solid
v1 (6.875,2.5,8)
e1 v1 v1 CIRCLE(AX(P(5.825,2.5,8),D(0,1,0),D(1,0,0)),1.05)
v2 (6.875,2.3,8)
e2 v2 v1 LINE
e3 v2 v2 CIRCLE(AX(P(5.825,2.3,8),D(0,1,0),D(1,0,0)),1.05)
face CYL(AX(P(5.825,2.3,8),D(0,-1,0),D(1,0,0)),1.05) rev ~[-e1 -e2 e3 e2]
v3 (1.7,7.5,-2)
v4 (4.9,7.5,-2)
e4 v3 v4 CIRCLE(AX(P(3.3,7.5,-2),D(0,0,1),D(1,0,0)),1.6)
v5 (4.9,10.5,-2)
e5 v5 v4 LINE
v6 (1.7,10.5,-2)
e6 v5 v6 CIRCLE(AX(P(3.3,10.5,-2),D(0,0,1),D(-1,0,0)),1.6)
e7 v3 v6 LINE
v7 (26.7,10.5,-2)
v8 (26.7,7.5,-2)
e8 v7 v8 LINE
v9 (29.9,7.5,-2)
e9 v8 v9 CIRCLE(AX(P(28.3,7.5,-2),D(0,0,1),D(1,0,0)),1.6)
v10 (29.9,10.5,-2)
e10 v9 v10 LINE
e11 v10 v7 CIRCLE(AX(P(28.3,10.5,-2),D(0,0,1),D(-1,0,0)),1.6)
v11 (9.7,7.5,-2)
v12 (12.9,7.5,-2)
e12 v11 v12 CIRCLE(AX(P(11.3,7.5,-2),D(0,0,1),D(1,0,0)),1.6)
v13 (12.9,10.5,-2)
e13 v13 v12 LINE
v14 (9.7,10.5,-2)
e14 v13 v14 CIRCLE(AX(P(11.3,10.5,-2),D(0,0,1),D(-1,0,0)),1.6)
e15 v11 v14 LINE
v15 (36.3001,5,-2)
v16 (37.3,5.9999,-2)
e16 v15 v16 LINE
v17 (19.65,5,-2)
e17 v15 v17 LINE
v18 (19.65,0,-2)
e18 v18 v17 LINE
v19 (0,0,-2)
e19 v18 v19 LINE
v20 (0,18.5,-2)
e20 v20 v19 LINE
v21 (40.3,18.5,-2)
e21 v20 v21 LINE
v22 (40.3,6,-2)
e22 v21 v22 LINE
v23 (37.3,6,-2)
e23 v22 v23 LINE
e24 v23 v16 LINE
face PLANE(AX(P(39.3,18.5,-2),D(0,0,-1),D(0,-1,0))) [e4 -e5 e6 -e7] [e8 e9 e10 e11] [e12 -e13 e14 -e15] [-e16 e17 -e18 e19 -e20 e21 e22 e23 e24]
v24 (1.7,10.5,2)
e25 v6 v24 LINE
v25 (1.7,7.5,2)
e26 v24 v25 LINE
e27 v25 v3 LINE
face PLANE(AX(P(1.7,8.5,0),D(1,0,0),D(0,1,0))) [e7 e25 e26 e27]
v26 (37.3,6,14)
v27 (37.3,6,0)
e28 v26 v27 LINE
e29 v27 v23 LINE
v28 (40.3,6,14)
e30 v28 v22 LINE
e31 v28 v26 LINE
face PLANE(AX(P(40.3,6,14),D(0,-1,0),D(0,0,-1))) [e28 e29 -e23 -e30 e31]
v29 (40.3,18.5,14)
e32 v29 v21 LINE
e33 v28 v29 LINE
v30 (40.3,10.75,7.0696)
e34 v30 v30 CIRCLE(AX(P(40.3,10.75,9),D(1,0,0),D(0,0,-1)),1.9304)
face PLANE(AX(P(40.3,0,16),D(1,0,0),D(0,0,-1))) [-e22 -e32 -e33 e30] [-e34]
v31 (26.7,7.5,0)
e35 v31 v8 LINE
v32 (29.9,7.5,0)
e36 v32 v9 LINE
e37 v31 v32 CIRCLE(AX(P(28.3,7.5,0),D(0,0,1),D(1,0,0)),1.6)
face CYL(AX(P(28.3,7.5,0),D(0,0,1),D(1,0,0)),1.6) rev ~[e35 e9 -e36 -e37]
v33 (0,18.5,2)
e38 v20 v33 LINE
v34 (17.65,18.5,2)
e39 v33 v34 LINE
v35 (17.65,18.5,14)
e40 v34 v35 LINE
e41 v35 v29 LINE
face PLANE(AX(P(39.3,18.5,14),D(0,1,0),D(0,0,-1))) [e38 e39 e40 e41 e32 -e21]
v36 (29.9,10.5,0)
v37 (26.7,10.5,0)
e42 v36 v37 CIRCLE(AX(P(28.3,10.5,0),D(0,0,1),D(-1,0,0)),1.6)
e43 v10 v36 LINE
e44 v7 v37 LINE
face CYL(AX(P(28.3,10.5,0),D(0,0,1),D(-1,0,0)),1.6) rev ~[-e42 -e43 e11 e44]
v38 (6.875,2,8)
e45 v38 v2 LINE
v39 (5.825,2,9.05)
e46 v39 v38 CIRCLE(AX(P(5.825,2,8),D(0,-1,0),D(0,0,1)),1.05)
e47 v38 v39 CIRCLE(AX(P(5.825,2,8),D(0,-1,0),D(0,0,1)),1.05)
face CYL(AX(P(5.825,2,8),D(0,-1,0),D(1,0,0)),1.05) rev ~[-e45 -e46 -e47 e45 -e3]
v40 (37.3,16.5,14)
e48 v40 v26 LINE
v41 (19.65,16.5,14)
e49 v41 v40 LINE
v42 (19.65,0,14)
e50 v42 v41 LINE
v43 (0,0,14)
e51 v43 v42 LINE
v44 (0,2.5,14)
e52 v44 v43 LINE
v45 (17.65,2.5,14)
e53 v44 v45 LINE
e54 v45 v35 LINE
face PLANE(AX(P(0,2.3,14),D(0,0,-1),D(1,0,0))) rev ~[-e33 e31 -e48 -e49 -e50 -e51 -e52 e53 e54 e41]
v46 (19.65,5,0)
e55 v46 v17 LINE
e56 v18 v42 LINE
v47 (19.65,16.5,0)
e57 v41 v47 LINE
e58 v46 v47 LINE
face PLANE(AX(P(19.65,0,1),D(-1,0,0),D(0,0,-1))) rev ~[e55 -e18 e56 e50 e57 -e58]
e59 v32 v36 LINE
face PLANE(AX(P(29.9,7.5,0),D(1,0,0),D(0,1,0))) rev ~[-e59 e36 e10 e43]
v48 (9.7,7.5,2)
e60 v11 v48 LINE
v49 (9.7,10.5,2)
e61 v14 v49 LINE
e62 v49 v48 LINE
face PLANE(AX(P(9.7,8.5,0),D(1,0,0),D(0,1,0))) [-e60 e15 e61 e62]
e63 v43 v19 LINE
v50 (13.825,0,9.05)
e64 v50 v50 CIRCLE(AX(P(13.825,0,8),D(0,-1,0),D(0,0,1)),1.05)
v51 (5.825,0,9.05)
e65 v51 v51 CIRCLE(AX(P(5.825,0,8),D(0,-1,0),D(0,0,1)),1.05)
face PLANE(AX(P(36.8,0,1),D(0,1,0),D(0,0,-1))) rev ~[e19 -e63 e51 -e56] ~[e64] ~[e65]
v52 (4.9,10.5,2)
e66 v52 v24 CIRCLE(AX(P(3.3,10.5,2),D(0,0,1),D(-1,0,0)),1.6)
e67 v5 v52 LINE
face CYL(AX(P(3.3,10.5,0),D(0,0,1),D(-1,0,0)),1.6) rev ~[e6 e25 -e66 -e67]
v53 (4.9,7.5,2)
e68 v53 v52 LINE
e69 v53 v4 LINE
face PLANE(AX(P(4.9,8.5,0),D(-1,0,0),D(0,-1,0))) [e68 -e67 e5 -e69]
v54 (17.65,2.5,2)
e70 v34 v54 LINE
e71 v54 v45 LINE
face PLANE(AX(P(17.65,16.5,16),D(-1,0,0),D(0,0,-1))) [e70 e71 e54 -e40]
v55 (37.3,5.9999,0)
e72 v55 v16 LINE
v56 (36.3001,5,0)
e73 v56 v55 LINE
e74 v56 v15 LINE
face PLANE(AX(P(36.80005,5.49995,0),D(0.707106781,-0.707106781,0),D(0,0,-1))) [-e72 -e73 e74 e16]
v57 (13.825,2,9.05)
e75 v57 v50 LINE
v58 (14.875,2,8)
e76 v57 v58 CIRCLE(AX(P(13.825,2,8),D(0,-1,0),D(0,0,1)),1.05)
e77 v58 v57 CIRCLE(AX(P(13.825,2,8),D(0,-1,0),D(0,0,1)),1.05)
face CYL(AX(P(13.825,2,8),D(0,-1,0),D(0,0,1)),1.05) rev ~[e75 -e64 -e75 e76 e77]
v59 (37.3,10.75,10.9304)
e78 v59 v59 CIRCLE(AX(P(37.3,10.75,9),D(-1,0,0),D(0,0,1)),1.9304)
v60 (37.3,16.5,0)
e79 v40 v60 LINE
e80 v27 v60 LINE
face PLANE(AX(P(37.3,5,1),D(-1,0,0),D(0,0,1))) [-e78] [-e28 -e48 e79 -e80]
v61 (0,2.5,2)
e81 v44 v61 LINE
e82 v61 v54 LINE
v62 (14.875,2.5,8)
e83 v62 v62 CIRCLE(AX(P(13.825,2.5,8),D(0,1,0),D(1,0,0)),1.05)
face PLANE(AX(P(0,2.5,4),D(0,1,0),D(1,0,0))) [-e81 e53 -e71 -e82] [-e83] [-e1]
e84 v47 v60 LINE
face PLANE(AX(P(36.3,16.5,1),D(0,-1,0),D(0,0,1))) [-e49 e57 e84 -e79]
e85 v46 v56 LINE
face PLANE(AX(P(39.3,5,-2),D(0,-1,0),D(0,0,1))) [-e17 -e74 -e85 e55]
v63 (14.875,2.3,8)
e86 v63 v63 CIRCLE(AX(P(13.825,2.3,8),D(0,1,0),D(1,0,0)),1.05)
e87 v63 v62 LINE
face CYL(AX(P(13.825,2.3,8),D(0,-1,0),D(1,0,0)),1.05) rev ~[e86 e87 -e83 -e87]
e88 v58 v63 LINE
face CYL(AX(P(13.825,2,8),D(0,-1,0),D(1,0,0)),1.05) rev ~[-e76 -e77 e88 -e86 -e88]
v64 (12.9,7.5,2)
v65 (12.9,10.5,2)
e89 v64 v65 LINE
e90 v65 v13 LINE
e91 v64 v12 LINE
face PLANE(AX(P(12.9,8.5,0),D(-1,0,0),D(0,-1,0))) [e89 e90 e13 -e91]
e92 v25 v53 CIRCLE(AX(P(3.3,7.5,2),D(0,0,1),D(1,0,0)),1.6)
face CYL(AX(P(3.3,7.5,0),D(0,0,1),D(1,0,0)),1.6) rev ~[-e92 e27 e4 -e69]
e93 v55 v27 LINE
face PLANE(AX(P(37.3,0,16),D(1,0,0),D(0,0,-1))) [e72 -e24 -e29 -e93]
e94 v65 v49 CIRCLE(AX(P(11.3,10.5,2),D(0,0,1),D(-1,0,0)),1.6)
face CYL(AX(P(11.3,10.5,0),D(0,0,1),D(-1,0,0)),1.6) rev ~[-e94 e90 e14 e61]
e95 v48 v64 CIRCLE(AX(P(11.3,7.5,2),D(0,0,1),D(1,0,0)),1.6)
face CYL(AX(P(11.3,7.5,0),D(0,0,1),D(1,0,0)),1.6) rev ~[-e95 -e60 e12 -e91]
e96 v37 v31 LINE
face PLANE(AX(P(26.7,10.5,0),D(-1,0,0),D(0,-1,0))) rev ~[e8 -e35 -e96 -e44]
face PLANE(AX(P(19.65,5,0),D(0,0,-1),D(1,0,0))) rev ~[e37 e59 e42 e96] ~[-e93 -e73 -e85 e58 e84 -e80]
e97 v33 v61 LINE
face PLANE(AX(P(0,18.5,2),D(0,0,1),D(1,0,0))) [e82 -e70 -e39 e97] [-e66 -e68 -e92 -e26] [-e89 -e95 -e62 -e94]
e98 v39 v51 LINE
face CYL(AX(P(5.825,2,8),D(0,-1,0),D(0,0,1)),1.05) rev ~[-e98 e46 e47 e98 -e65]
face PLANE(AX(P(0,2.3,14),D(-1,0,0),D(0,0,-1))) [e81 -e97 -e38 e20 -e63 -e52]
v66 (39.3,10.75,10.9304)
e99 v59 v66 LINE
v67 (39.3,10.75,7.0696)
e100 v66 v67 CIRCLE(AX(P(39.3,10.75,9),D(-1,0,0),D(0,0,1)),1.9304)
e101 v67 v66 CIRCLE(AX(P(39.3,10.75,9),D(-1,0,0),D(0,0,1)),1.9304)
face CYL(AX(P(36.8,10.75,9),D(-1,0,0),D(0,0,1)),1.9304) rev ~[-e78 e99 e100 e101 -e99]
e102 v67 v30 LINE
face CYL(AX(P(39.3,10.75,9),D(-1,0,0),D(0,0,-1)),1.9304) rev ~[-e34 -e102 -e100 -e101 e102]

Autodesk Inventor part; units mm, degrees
ref_plane "YZ Plane" through (0, 0, 0) normal (1, 0, 0) x (0, 1, 0)
ref_plane "XZ Plane" through (0, 0, 0) normal (0, 1, 0) x (-1, 0, 0)
ref_plane "XY Plane" through (0, 0, 0) normal (0, 0, 1) x (1, 0, 0)
sketch "Sketch1" plane through (0, 0, 0) normal (0, 0, 1) x (1, 0, 0)
  line L0 (0, 0) -> (49.1, 0)
  line L1 (49.1, 0) -> (49.1, 12.5)
  line L2 (49.1, 12.5) -> (0, 12.5)
  line L3 (0, 12.5) -> (0, 0)
  line L4 (0, 0) -> (49.1, 0)
  line L5 (49.1, 0) -> (49.1, 12.5)
  dimension "d0" = 49.1
  dimension "d1" = 12.5
extrude "Extrusion1" add sketch "Sketch1" along normal blind 14
sketch "Sketch2" plane through (0, 0, 0) normal (-1, 0, 0) x (0, 0, 1)
  line L0 (0, 0) -> (2, 0)
  line L1 (2, 0) -> (2, 5)
  line L2 (2, 5) -> (0, 5)
  line L3 (0, 5) -> (0, 0)
  dimension "d4" = 2
  dimension "d5" = 5
sketch "Sketch3" plane through (0, 0, 14) normal (0, 0, 1) x (1, 0, 0)
  line L0 (0, 12.5) -> (0, 0) projected
  line L1 (49.1, 0) -> (49.1, 12.5) projected
  line L2 (0, 0) -> (49.1, 0)
  line L3 (49.1, 0) -> (47.6, 0)
  line L4 (0, 0) -> (49.1, 0) projected
  line L5 (47.6, 0) -> (47.6, 11.5)
  line L6 (49.1, 12.5) -> (0, 12.5) projected
  line L7 (47.6, 11.5) -> (19.65, 11.5)
  line L8 (19.65, 11.5) -> (19.65, 0)
  dimension "d8" = 1.5
  dimension "d9" = 11.5
  dimension "d10" = 27.95
extrude "Extrusion3" cut sketch "Sketch3" against normal blind 13 contours L8 L7 L5 L2
sketch "Sketch4" plane through (0, 0, 14) normal (-1, 0, 0) x (0, 0, 1)
  line L0 (0, 12.5) -> (0, 0) projected
  line L1 (0, 0) -> (0, 2)
  line L2 (0, 2) -> (0, 12.5)
  line L3 (0, 2) -> (-10, 2)
  line L4 (-12, 5) -> (-12, 0) projected
  line L5 (-10, 2) -> (-10, 12.5)
  line L6 (-14, 12.5) -> (0, 12.5) projected
  line L7 (-10, 12.5) -> (0, 12.5)
  point P0 (-14, 0)
  dimension "d13" = 2
  dimension "d14" = 10
extrude "Extrusion4" cut sketch "Sketch4" against normal blind 17.65
sketch "Sketch5" plane through (0, 2, 14) normal (0, 1, 0) x (1, 0, 0)
  line L0 (17.65, 0) -> (0, 0) projected
  line L1 (0, 0) -> (5.825, 0)
  line L2 (5.825, 0) -> (5.825, 6)
  line L3 (5.825, 6) -> (13.825, 6)
  circle A0 centre (5.825, 6) radius 1.05
  circle A1 centre (13.825, 6) radius 1.05
  point P0 (0, 14)
  dimension "d18" = 5.825
  dimension "d19" = 6
  dimension "d20" = 8
  dimension "d21" = 2.1
  dimension "d22" = 2.1
hole "Hole1" at (5.825, 2, 8) at (13.825, 2, 8) direction (0, -1, 0) diameter 2.1 depth 20 tip angle 118
sketch "Sketch6" plane through (0, 0, 0) normal (0, 0, -1) x (-1, 0, 0)
  line L0 (0, 12.5) -> (0, 8.5)
  line L1 (0, 8.5) -> (-3.3, 8.5)
  line L2 (-4.9, 8.5) -> (-11.3, 8.5)
  line L3 (-12.9, 8.5) -> (-28.3, 8.5)
  line L4 (-28.3, 9.8) -> (-28.3, 10.5)
  line L5 (-28.3, 9.2) -> (-28.3, 7.5)
  line L6 (-11.3, 8.5) -> (-11.3, 10.5)
  line L7 (-11.3, 10.5) -> (-11.3, 7.5)
  line L8 (-3.3, 8.5) -> (-3.3, 9.1)
  line L9 (-3.3, 10.5) -> (-3.3, 7.5)
  arc A0 (-29.9, 7.5) -> (-26.7, 7.5) centre (-28.3, 7.5) ccw
  arc A1 (-4.9, 7.5) -> (-1.7, 7.5) centre (-3.3, 7.5) ccw
  arc A2 (-1.7, 10.5) -> (-4.9, 10.5) centre (-3.3, 10.5) ccw
  line L10 (-26.7, 10.5) -> (-26.7, 7.5)
  line L11 (-29.9, 7.5) -> (-29.9, 10.5)
  line L12 (-12.9, 10.5) -> (-12.9, 7.5)
  line L13 (-9.7, 7.5) -> (-9.7, 10.5)
  line L14 (-4.9, 10.5) -> (-4.9, 7.5)
  line L15 (-1.7, 7.5) -> (-1.7, 10.5)
  arc A3 (-12.9, 7.5) -> (-9.7, 7.5) centre (-11.3, 7.5) ccw
  arc A4 (-9.7, 10.5) -> (-12.9, 10.5) centre (-11.3, 10.5) ccw
  arc A5 (-26.7, 10.5) -> (-29.9, 10.5) centre (-28.3, 10.5) ccw
  arc A6 (-29.1307, 9.5) -> (-28.3, 9.2) centre (-28.3, 10.5) ccw
  point P0 (0, 0)
  dimension "d30" = 4
  dimension "d31" = 3.3
  dimension "d32" = 8
  dimension "d33" = 17
  dimension "d47" = 2
  dimension "d48" = 1
  dimension "d49" = 2
  dimension "d50" = 3
  dimension "d51" = 2
  dimension "d52" = 3
  dimension "d53" = 3.2
  dimension "d55" = 3.2
  dimension "d56" = 3.2
  dimension "d134" = 1.6
sketch "Sketch7" plane through (0, 0, 14) normal (0, 0, 1) x (1, 0, 0)
  line L0 (0, 12.5) -> (0, 0) projected
  line L1 (19.65, 0) -> (19.65, 11.5) projected
  line L2 (0, 0) -> (19.65, 0)
  line L3 (19.65, 0) -> (19.65, 2)
  line L4 (19.65, 2) -> (0, 2)
  line L5 (0, 2) -> (0, 0)
  line L6 (17.65, 12.5) -> (15.65, 12.5) projected
  line L7 (19.65, 2) -> (17.65, 2)
  line L8 (17.65, 2) -> (17.65, 12.5)
  line L9 (17.65, 12.5) -> (19.65, 12.5)
  line L10 (19.65, 12.5) -> (19.65, 2)
  line L11 (49.1, 0) -> (49.1, 12.5) projected
  line L12 (17.65, 12.5) -> (49.1, 12.5)
  line L13 (49.1, 12.5) -> (49.1, 11.5)
  line L14 (47.6, 11.5) -> (19.65, 11.5)
  line L15 (17.65, 11.5) -> (17.65, 12.5)
  line L16 (47.6, 11.5) -> (47.6, 0) projected
  line L17 (47.6, 11.5) -> (47.6, 0)
  line L18 (47.6, 0) -> (49.1, 0)
  line L19 (49.1, 0) -> (49.1, 11.5)
  dimension "d41" = 2
extrude "Extrusion5" add sketch "Sketch7" along normal blind 2
sketch "Sketch9" plane through (0, 0, 0) normal (-1, 0, 0) x (0, 0, 1)
  line L0 (0, 0) -> (16, 0) projected
  line L1 (1, 0) -> (1, 11.5) projected
  line L2 (0, 0) -> (1, 0)
  line L3 (1, 0) -> (1, 4)
  line L4 (1, 4) -> (0, 4)
  line L5 (0, 4) -> (0, 0)
  dimension "d44" = 4
extrude "Extrusion6" cut sketch "Sketch9" against normal blind 100
sketch "Sketch11" plane through (0, 2, 4) normal (-1, 0, 0) x (0, 0, 1)
  line L0 (0, 0) -> (0, 10.5) projected
  line L1 (0, 0) -> (0, 2)
  line L2 (-4, 10.5) -> (-4, 2) projected
  line L3 (0, 2) -> (-4, 2)
  line L4 (-4, 2) -> (-6, 2)
  line L5 (-6, 2) -> (-6, 10.5)
  line L6 (-4, 10.5) -> (0, 10.5) projected
  line L7 (-6, 10.5) -> (-4, 10.5)
  line L8 (-4, 10.5) -> (-4, 2)
  point P0 (-4, -2)
  dimension "d61" = 2
  dimension "d62" = 4
  dimension "d63" = 2
extrude "Extrusion8" add sketch "Sketch11" against normal blind 49.1 contours L4 L5 L7 L2
extrude "Extrusion7" cut sketch "Sketch6" along normal blind 100 and the other way blind 50
sketch "Sketch12" plane through (0, 2, 4) normal (-1, 0, 0) x (0, 0, 1)
  line L0 (0, 0) -> (0, 10.5) projected
  line L1 (0, 0) -> (-3, 0)
  line L2 (-3, -2) -> (-3, 2) projected
  line L3 (-3, -2) -> (12, -2) projected
  line L4 (-3, -2) -> (-6, -2)
  line L5 (-3, 2) -> (-6, 2) projected
  line L6 (-6, -2) -> (-6, 2)
  line L7 (-6, 2) -> (-3, 2)
  line L8 (-3, 2) -> (-3, -2)
  point P0 (-4, -2)
  dimension "d68" = 3
  dimension "d69" = 4
  dimension "d70" = 90
extrude "Extrusion9" add sketch "Sketch12" against normal blind 49.1
sketch "Sketch13" plane through (47.6, 0, 1) normal (-1, 0, 0) x (0, 0, 1)
  line L0 (15, 0) -> (0, 0) projected
  line L1 (0, 11.5) -> (0, 0) projected
  line L2 (0, 0) -> (0, 11.5)
  line L3 (15, 11.5) -> (0, 11.5) projected
  line L4 (0, 11.5) -> (15, 11.5)
  line L5 (15, 11.5) -> (15, 0)
  line L6 (15, 0) -> (0, 0)
  point P0 (-1, 0)
extrude "Extrusion10" add sketch "Sketch13" along normal blind 1
sketch "Sketch14" plane through (49.1, 0, 16) normal (1, 0, 0) x (0, 0, -1)
  line L0 (15, 0) -> (0, 0) projected
  line L1 (18, 12.5) -> (0, 12.5) projected
  line L2 (0, 0) -> (18, 0)
  line L3 (18, 0) -> (18, 12.5)
  line L4 (18, 12.5) -> (0, 12.5)
  line L5 (0, 12.5) -> (0, 0)
  point P0 (16, 0)
extrude "Extrusion11" cut sketch "Sketch14" against normal blind 12.3
sketch "Sketch15" plane through (36.8, 0, 16) normal (1, 0, 0) x (0, 0, -1)
  line L0 (18, 12.5) -> (18, 0) projected
  line L1 (15, 0) -> (0, 0) projected
  line L2 (18, 12.5) -> (0, 12.5)
  line L3 (0, 12.5) -> (0, 0)
  line L4 (0, 0) -> (18, 0)
  line L5 (18, 0) -> (18, 12.5)
  point P0 (16, 0)
  point P1 (18, 0)
extrude "Extrusion12" add sketch "Sketch15" along normal blind 2.5
sketch "Sketch17" plane through (0, 0, -2) normal (0, -1, 0) x (1, 0, 0)
  line L0 (39.3, 0) -> (39.3, 18) projected
  line L1 (39.3, 0) -> (39.3, 16)
  line L2 (39.3, 16) -> (36.8, 16)
  line L3 (36.8, 3) -> (36.8, 18) projected
  line L4 (36.8, 16) -> (36.8, 3)
  line L5 (19.65, 3) -> (36.8, 3) projected
  line L6 (36.8, 3) -> (19.65, 3)
  line L7 (19.65, 3) -> (19.65, 0)
  line L8 (0, 0) -> (39.3, 0) projected
  line L9 (19.65, 0) -> (39.3, 0)
  point P0 (0, 2)
extrude "Extrusion14" cut sketch "Sketch17" against normal blind 5
sketch "Sketch18" plane through (36.8, 0, 16) normal (0, -1, 0) x (1, 0, 0)
  line L0 (2.5, 0) -> (-19.15, 0) projected
  line L1 (2.5, 0) -> (0, 0)
  line L2 (0, 0) -> (0, -2)
  line L3 (0, -2) -> (2.5, -2)
  line L4 (2.5, -2) -> (2.5, 0)
  point P0 (-36.8, -16)
  dimension "d84" = 2.5
  dimension "d85" = 2
extrude "Extrusion15" cut sketch "Sketch18" against normal blind 5
sketch "Sketch19" plane through (19.65, 11.5, 1) normal (0, -1, 0) x (1, 0, 0)
  line L0 (0, 15) -> (0, 0) projected
  line L1 (0, 0) -> (0, 15)
  line L2 (0, 15) -> (17.15, 15)
  line L3 (19.65, 15) -> (-2, 15) projected
  line L4 (17.15, 15) -> (17.15, 0)
  line L5 (17.15, 0) -> (0, 0)
  point P0 (-19.65, -1)
  point P1 (0, 0)
  dimension "d88" = 17.15
  dimension "d89" = 15
extrude "Extrusion16" cut sketch "Sketch19" against normal blind 5
sketch "Sketch20" plane through (0, 12.5, 4) normal (0, 1, 0) x (1, 0, 0)
  line L0 (0, 6) -> (0, -12) projected
  line L1 (0, 6) -> (0, 0)
  line L2 (0, 6) -> (39.3, 6) projected
  line L3 (0, 6) -> (39.3, 6)
  line L4 (39.3, -12) -> (39.3, 6) projected
  line L5 (39.3, 6) -> (39.3, -12)
  line L6 (39.3, -12) -> (36.8, -12) projected
  line L7 (39.3, -12) -> (36.8, -12)
  line L8 (36.8, -12) -> (36.8, 3)
  line L9 (36.8, 3) -> (19.65, 3)
  line L10 (19.65, -12) -> (19.65, 3) projected
  line L11 (19.65, 3) -> (19.65, -12)
  line L12 (17.65, -12) -> (17.65, 0) projected
  line L13 (19.65, -12) -> (17.65, -12)
  line L14 (17.65, -12) -> (17.65, 0)
  line L15 (17.65, 0) -> (17.65, 6)
  point P0 (0, 4)
  dimension "d92" = 6
extrude "Extrusion17" add sketch "Sketch20" along normal blind 4
sketch "Sketch21" plane through (0, 12.5, 4) normal (0, 1, 0) x (1, 0, 0)
  line L0 (0, -12) -> (0, 0) projected
  line L1 (0, 0) -> (17.65, 0)
  line L2 (17.65, 0) -> (17.65, 6)
  line L3 (17.65, 6) -> (0, 6)
  line L4 (0, 6) -> (0, 0)
  point P0 (0, 4)
extrude "Extrusion18" add sketch "Sketch21" along normal blind 4
sketch "Sketch22" plane through (0, 16.5, 4) normal (0, 1, 0) x (1, 0, 0)
  line L0 (0, 6) -> (0, 0) projected
  line L1 (0, 0) -> (36.92, 0)
  line L2 (19.65, 3) -> (36.8, 3) projected
  line L3 (36.8, 3) -> (36.8, 0)
  line L4 (36.8, 3) -> (36.8, -12) projected
  line L5 (36.8, 0) -> (36.3, 0)
  line L6 (36.3, 0) -> (36.3, 3)
  point P0 (0, 4)
  dimension "d97" = 3
  dimension "d98" = 0.5
extrude "Extrusion19" add sketch "Sketch22" against normal blind 11.5
sketch "Sketch23" plane through (36.8, 0, 16) normal (-1, 0, 0) x (0, 0, 1)
  line L0 (0, 0) -> (0, 5)
  line L1 (-12, 5) -> (0, 5) projected
  line L2 (0, 5) -> (-12, 5)
  line L3 (-12, 16.5) -> (-12, 5) projected
  line L4 (-12, 5) -> (-12, 16.5)
  line L5 (-12, 16.5) -> (0, 16.5)
  line L6 (0, 16.5) -> (0, 5)
  line L7 (0, 5) -> (0, 16.5) projected
  line L8 (0, 10.75) -> (-7, 10.75)
  circle A0 centre (-7, 10.75) radius 1.9304
  point P0 (-16, 0)
  dimension "d101" = 5
  dimension "d102" = 12
  dimension "d103" = 7
  dimension "d104" = 3.8608
sketch "Sketch24" plane through (0, 16.5, 4) normal (0, 1, 0) x (1, 0, 0)
  line L0 (39.3, -12) -> (39.3, 6) projected
  line L1 (39.3, -12) -> (36.3, -12)
  line L2 (36.8, -12) -> (39.3, -12) projected
  line L3 (36.3, -12) -> (36.3, 0)
  line L4 (36.3, 0) -> (36.8, 0) projected
  line L5 (36.8, 0) -> (36.8, -12) projected
  line L6 (36.8, 0) -> (36.8, -12)
  point P0 (0, 4)
  dimension "d107" = 3
extrude "Extrusion21" add sketch "Sketch24" against normal blind 11.5
extrude "Extrusion22" cut sketch "Sketch23" along normal mid plane 11.5 contours A0
sketch "Sketch25" plane through (0, 16.5, 4) normal (0, 1, 0) x (1, 0, 0)
  line L0 (17.65, -12) -> (0, -12) projected
  line L1 (39.3, 6) -> (0, 6) projected
  line L2 (0, -12) -> (39.3, -12)
  line L3 (39.3, -12) -> (39.3, 6)
  line L4 (39.3, 6) -> (0, 6)
  line L5 (0, 6) -> (0, -12)
  line L6 (0, 0) -> (17.65, 0) projected
  line L7 (17.65, 0) -> (0, 0)
  line L8 (0, 0) -> (0, -12)
  line L9 (0, -12) -> (17.65, -12)
  line L10 (17.65, -12) -> (17.65, 0)
  point P0 (0, 4)
extrude "Extrusion23" add sketch "Sketch25" along normal blind 2 contours L10 L6 L5 L1 L3 L2
sketch "Sketch26" plane through (0, 0, 16) normal (0, 0, 1) x (1, 0, 0)
  line L0 (0, 18.5) -> (0, 0) projected
  line L1 (19.65, 0) -> (19.65, 16.5) projected
  line L2 (0, 0) -> (19.65, 0)
  line L3 (19.65, 5) -> (19.65, 16.5) projected
  line L4 (19.65, 0) -> (19.65, 16.5)
  line L5 (19.65, 16.5) -> (36.3, 16.5) projected
  line L6 (19.65, 16.5) -> (36.3, 16.5)
  line L7 (36.3, 16.5) -> (36.3, 5) projected
  line L8 (36.3, 16.5) -> (36.3, 5)
  line L9 (39.3, 5) -> (19.65, 5) projected
  line L10 (36.3, 5) -> (39.3, 5)
  line L11 (39.3, 18.5) -> (0, 18.5) projected
  line L12 (39.3, 5) -> (39.3, 18.5)
  line L13 (39.3, 18.5) -> (17.65, 18.5)
  line L14 (0, 2) -> (17.65, 2) projected
  line L15 (0, 0) -> (0, 2)
  line L16 (0, 2) -> (17.65, 2)
  line L17 (0, 2) -> (17.65, 2)
  line L18 (17.65, 2) -> (17.65, 18.5)
  line L19 (17.65, 18.5) -> (0, 18.5)
  line L20 (0, 18.5) -> (0, 2)
  dimension "d114" = 3
  dimension "d115" = 21.65
extrude "Extrusion24" cut sketch "Sketch26" against normal blind 2 contours L14 L18 L11 L12 L9 L7 L5 L1 L2 L0
sketch "Sketch27" plane through (39.3, 0, 16) normal (1, 0, 0) x (0, 0, -1)
  line L0 (18, 18.5) -> (18, 0) projected
  line L1 (18, 0) -> (18, 5)
  line L2 (2, 5) -> (15, 5) projected
  line L3 (18, 5) -> (2, 5)
  line L4 (2, 18.5) -> (18, 18.5) projected
  line L5 (2, 5) -> (2, 18.5)
  line L6 (2, 18.5) -> (18, 18.5)
  line L7 (18, 18.5) -> (18, 5)
  circle A0 centre (7, 10.75) radius 1.9304 projected
  circle A1 centre (7, 10.75) radius 1.5
  point P0 (16, 0)
  dimension "d118" = 5
  dimension "d119" = 16
extrude "Extrusion25" add sketch "Sketch27" along normal blind 1 contours L0 L3 L2 L5 L4
sketch "Sketch28" plane through (36.3, 5, 1) normal (-1, 0, 0) x (0, 0, 1)
  line L0 (0, 0) -> (0, 11.5) projected
  line L1 (0, 0) -> (0, 11.5)
  line L2 (0, 11.5) -> (13, 11.5) projected
  line L3 (0, 11.5) -> (13, 11.5)
  line L4 (13, 11.5) -> (13, 0)
  line L5 (13, 0) -> (0, 0) projected
  line L6 (13, 0) -> (0, 0)
  circle A0 centre (8, 5.75) radius 1.9304 projected
  circle A1 centre (8, 5.75) radius 1.5
  point P0 (-1, -5)
  dimension "d122" = 11.5
extrude "Extrusion26" cut sketch "Sketch28" against normal blind 1 contours L0 L2 L4 L5
sketch "Sketch29" plane through (0, 5, -2) normal (0, -1, 0) x (1, 0, 0)
  line L0 (19.65, 0) -> (19.65, 3) projected
  line L1 (19.65, 0) -> (19.65, 3)
  line L2 (19.65, 3) -> (19.65, 2)
  line L3 (19.65, 2) -> (37.4623, 2)
  line L4 (19.65, 3) -> (37.3, 3) projected
  line L5 (37.3, 3) -> (37.3, 1.7723)
  line L6 (37.3, 3) -> (19.65, 3)
  point P0 (0, 2)
  point P1 (37.3, 2)
  dimension "d125" = 1
extrude "Extrusion27" cut sketch "Sketch29" against normal blind 11.5
sketch "Sketch30" plane through (0, 2, 4) normal (0, 1, 0) x (1, 0, 0)
  line L0 (0, 0) -> (17.65, 0) projected
  line L1 (17.65, -10) -> (17.65, 0) projected
  line L2 (0, 0) -> (17.65, 0)
  line L3 (17.65, 0) -> (17.65, -10)
  line L4 (17.65, -10) -> (0, -10)
  line L5 (0, -10) -> (0, 0)
  circle A0 centre (5.825, -4) radius 1.05 projected
  circle A1 centre (5.825, -4) radius 1.05
  circle A2 centre (13.825, -4) radius 1.05 projected
  circle A3 centre (13.825, -4) radius 1.05
  point P0 (0, 4)
extrude "Extrusion29" add sketch "Sketch30" along normal blind 0.3
sketch "Sketch31" plane through (0, 18.5, 4) normal (0, 0, 1) x (1, 0, 0)
  line L0 (0, 0) -> (0, -18.5) projected
  line L1 (17.65, 0) -> (17.65, -16.2) projected
  line L2 (0, 0) -> (17.65, 0)
  line L3 (17.65, 0) -> (17.65, -16.2)
  line L4 (17.65, -16.2) -> (0, -16.2)
  line L5 (0, -16.2) -> (0, 0)
extrude "Extrusion30" cut sketch "Sketch31" against normal blind 2
sketch "Sketch32" plane through (0, 2.3, 4) normal (0, 1, 0) x (1, 0, 0)
  line L0 (0, 2) -> (17.65, 2) projected
  line L1 (0, -10) -> (17.65, -10) projected
  line L2 (0, 2) -> (17.65, 2)
  line L3 (17.65, 2) -> (17.65, -10)
  line L4 (17.65, -10) -> (0, -10)
  line L5 (0, -10) -> (0, 2)
  circle A0 centre (5.825, -4) radius 1.05 projected
  circle A1 centre (5.825, -4) radius 1.05
  circle A2 centre (13.825, -4) radius 1.05 projected
  circle A3 centre (13.825, -4) radius 1.05
  point P0 (0, 4)
  point P1 (17.65, 2)
extrude "Extrusion31" add sketch "Sketch32" along normal blind 0.2
sketch "Sketch33" plane through (40.3, 0, 16) normal (1, 0, 0) x (0, 0, -1)
  line L0 (2, 5) -> (18, 5) projected
  line L1 (2, 18.5) -> (2, 5) projected
  line L2 (18, 5) -> (2, 5)
  line L3 (2, 5) -> (2, 6)
  line L4 (2, 6) -> (18, 6)
  line L5 (18, 6) -> (18, 5)
  point P0 (16, 0)
  dimension "d137" = 1
extrude "Extrusion32" cut sketch "Sketch33" against normal blind 3
chamfer "Chamfer1" distance 1 angle 45 1 edges at (37.3, 5, -1)
properties part number "Compliant_plate"
